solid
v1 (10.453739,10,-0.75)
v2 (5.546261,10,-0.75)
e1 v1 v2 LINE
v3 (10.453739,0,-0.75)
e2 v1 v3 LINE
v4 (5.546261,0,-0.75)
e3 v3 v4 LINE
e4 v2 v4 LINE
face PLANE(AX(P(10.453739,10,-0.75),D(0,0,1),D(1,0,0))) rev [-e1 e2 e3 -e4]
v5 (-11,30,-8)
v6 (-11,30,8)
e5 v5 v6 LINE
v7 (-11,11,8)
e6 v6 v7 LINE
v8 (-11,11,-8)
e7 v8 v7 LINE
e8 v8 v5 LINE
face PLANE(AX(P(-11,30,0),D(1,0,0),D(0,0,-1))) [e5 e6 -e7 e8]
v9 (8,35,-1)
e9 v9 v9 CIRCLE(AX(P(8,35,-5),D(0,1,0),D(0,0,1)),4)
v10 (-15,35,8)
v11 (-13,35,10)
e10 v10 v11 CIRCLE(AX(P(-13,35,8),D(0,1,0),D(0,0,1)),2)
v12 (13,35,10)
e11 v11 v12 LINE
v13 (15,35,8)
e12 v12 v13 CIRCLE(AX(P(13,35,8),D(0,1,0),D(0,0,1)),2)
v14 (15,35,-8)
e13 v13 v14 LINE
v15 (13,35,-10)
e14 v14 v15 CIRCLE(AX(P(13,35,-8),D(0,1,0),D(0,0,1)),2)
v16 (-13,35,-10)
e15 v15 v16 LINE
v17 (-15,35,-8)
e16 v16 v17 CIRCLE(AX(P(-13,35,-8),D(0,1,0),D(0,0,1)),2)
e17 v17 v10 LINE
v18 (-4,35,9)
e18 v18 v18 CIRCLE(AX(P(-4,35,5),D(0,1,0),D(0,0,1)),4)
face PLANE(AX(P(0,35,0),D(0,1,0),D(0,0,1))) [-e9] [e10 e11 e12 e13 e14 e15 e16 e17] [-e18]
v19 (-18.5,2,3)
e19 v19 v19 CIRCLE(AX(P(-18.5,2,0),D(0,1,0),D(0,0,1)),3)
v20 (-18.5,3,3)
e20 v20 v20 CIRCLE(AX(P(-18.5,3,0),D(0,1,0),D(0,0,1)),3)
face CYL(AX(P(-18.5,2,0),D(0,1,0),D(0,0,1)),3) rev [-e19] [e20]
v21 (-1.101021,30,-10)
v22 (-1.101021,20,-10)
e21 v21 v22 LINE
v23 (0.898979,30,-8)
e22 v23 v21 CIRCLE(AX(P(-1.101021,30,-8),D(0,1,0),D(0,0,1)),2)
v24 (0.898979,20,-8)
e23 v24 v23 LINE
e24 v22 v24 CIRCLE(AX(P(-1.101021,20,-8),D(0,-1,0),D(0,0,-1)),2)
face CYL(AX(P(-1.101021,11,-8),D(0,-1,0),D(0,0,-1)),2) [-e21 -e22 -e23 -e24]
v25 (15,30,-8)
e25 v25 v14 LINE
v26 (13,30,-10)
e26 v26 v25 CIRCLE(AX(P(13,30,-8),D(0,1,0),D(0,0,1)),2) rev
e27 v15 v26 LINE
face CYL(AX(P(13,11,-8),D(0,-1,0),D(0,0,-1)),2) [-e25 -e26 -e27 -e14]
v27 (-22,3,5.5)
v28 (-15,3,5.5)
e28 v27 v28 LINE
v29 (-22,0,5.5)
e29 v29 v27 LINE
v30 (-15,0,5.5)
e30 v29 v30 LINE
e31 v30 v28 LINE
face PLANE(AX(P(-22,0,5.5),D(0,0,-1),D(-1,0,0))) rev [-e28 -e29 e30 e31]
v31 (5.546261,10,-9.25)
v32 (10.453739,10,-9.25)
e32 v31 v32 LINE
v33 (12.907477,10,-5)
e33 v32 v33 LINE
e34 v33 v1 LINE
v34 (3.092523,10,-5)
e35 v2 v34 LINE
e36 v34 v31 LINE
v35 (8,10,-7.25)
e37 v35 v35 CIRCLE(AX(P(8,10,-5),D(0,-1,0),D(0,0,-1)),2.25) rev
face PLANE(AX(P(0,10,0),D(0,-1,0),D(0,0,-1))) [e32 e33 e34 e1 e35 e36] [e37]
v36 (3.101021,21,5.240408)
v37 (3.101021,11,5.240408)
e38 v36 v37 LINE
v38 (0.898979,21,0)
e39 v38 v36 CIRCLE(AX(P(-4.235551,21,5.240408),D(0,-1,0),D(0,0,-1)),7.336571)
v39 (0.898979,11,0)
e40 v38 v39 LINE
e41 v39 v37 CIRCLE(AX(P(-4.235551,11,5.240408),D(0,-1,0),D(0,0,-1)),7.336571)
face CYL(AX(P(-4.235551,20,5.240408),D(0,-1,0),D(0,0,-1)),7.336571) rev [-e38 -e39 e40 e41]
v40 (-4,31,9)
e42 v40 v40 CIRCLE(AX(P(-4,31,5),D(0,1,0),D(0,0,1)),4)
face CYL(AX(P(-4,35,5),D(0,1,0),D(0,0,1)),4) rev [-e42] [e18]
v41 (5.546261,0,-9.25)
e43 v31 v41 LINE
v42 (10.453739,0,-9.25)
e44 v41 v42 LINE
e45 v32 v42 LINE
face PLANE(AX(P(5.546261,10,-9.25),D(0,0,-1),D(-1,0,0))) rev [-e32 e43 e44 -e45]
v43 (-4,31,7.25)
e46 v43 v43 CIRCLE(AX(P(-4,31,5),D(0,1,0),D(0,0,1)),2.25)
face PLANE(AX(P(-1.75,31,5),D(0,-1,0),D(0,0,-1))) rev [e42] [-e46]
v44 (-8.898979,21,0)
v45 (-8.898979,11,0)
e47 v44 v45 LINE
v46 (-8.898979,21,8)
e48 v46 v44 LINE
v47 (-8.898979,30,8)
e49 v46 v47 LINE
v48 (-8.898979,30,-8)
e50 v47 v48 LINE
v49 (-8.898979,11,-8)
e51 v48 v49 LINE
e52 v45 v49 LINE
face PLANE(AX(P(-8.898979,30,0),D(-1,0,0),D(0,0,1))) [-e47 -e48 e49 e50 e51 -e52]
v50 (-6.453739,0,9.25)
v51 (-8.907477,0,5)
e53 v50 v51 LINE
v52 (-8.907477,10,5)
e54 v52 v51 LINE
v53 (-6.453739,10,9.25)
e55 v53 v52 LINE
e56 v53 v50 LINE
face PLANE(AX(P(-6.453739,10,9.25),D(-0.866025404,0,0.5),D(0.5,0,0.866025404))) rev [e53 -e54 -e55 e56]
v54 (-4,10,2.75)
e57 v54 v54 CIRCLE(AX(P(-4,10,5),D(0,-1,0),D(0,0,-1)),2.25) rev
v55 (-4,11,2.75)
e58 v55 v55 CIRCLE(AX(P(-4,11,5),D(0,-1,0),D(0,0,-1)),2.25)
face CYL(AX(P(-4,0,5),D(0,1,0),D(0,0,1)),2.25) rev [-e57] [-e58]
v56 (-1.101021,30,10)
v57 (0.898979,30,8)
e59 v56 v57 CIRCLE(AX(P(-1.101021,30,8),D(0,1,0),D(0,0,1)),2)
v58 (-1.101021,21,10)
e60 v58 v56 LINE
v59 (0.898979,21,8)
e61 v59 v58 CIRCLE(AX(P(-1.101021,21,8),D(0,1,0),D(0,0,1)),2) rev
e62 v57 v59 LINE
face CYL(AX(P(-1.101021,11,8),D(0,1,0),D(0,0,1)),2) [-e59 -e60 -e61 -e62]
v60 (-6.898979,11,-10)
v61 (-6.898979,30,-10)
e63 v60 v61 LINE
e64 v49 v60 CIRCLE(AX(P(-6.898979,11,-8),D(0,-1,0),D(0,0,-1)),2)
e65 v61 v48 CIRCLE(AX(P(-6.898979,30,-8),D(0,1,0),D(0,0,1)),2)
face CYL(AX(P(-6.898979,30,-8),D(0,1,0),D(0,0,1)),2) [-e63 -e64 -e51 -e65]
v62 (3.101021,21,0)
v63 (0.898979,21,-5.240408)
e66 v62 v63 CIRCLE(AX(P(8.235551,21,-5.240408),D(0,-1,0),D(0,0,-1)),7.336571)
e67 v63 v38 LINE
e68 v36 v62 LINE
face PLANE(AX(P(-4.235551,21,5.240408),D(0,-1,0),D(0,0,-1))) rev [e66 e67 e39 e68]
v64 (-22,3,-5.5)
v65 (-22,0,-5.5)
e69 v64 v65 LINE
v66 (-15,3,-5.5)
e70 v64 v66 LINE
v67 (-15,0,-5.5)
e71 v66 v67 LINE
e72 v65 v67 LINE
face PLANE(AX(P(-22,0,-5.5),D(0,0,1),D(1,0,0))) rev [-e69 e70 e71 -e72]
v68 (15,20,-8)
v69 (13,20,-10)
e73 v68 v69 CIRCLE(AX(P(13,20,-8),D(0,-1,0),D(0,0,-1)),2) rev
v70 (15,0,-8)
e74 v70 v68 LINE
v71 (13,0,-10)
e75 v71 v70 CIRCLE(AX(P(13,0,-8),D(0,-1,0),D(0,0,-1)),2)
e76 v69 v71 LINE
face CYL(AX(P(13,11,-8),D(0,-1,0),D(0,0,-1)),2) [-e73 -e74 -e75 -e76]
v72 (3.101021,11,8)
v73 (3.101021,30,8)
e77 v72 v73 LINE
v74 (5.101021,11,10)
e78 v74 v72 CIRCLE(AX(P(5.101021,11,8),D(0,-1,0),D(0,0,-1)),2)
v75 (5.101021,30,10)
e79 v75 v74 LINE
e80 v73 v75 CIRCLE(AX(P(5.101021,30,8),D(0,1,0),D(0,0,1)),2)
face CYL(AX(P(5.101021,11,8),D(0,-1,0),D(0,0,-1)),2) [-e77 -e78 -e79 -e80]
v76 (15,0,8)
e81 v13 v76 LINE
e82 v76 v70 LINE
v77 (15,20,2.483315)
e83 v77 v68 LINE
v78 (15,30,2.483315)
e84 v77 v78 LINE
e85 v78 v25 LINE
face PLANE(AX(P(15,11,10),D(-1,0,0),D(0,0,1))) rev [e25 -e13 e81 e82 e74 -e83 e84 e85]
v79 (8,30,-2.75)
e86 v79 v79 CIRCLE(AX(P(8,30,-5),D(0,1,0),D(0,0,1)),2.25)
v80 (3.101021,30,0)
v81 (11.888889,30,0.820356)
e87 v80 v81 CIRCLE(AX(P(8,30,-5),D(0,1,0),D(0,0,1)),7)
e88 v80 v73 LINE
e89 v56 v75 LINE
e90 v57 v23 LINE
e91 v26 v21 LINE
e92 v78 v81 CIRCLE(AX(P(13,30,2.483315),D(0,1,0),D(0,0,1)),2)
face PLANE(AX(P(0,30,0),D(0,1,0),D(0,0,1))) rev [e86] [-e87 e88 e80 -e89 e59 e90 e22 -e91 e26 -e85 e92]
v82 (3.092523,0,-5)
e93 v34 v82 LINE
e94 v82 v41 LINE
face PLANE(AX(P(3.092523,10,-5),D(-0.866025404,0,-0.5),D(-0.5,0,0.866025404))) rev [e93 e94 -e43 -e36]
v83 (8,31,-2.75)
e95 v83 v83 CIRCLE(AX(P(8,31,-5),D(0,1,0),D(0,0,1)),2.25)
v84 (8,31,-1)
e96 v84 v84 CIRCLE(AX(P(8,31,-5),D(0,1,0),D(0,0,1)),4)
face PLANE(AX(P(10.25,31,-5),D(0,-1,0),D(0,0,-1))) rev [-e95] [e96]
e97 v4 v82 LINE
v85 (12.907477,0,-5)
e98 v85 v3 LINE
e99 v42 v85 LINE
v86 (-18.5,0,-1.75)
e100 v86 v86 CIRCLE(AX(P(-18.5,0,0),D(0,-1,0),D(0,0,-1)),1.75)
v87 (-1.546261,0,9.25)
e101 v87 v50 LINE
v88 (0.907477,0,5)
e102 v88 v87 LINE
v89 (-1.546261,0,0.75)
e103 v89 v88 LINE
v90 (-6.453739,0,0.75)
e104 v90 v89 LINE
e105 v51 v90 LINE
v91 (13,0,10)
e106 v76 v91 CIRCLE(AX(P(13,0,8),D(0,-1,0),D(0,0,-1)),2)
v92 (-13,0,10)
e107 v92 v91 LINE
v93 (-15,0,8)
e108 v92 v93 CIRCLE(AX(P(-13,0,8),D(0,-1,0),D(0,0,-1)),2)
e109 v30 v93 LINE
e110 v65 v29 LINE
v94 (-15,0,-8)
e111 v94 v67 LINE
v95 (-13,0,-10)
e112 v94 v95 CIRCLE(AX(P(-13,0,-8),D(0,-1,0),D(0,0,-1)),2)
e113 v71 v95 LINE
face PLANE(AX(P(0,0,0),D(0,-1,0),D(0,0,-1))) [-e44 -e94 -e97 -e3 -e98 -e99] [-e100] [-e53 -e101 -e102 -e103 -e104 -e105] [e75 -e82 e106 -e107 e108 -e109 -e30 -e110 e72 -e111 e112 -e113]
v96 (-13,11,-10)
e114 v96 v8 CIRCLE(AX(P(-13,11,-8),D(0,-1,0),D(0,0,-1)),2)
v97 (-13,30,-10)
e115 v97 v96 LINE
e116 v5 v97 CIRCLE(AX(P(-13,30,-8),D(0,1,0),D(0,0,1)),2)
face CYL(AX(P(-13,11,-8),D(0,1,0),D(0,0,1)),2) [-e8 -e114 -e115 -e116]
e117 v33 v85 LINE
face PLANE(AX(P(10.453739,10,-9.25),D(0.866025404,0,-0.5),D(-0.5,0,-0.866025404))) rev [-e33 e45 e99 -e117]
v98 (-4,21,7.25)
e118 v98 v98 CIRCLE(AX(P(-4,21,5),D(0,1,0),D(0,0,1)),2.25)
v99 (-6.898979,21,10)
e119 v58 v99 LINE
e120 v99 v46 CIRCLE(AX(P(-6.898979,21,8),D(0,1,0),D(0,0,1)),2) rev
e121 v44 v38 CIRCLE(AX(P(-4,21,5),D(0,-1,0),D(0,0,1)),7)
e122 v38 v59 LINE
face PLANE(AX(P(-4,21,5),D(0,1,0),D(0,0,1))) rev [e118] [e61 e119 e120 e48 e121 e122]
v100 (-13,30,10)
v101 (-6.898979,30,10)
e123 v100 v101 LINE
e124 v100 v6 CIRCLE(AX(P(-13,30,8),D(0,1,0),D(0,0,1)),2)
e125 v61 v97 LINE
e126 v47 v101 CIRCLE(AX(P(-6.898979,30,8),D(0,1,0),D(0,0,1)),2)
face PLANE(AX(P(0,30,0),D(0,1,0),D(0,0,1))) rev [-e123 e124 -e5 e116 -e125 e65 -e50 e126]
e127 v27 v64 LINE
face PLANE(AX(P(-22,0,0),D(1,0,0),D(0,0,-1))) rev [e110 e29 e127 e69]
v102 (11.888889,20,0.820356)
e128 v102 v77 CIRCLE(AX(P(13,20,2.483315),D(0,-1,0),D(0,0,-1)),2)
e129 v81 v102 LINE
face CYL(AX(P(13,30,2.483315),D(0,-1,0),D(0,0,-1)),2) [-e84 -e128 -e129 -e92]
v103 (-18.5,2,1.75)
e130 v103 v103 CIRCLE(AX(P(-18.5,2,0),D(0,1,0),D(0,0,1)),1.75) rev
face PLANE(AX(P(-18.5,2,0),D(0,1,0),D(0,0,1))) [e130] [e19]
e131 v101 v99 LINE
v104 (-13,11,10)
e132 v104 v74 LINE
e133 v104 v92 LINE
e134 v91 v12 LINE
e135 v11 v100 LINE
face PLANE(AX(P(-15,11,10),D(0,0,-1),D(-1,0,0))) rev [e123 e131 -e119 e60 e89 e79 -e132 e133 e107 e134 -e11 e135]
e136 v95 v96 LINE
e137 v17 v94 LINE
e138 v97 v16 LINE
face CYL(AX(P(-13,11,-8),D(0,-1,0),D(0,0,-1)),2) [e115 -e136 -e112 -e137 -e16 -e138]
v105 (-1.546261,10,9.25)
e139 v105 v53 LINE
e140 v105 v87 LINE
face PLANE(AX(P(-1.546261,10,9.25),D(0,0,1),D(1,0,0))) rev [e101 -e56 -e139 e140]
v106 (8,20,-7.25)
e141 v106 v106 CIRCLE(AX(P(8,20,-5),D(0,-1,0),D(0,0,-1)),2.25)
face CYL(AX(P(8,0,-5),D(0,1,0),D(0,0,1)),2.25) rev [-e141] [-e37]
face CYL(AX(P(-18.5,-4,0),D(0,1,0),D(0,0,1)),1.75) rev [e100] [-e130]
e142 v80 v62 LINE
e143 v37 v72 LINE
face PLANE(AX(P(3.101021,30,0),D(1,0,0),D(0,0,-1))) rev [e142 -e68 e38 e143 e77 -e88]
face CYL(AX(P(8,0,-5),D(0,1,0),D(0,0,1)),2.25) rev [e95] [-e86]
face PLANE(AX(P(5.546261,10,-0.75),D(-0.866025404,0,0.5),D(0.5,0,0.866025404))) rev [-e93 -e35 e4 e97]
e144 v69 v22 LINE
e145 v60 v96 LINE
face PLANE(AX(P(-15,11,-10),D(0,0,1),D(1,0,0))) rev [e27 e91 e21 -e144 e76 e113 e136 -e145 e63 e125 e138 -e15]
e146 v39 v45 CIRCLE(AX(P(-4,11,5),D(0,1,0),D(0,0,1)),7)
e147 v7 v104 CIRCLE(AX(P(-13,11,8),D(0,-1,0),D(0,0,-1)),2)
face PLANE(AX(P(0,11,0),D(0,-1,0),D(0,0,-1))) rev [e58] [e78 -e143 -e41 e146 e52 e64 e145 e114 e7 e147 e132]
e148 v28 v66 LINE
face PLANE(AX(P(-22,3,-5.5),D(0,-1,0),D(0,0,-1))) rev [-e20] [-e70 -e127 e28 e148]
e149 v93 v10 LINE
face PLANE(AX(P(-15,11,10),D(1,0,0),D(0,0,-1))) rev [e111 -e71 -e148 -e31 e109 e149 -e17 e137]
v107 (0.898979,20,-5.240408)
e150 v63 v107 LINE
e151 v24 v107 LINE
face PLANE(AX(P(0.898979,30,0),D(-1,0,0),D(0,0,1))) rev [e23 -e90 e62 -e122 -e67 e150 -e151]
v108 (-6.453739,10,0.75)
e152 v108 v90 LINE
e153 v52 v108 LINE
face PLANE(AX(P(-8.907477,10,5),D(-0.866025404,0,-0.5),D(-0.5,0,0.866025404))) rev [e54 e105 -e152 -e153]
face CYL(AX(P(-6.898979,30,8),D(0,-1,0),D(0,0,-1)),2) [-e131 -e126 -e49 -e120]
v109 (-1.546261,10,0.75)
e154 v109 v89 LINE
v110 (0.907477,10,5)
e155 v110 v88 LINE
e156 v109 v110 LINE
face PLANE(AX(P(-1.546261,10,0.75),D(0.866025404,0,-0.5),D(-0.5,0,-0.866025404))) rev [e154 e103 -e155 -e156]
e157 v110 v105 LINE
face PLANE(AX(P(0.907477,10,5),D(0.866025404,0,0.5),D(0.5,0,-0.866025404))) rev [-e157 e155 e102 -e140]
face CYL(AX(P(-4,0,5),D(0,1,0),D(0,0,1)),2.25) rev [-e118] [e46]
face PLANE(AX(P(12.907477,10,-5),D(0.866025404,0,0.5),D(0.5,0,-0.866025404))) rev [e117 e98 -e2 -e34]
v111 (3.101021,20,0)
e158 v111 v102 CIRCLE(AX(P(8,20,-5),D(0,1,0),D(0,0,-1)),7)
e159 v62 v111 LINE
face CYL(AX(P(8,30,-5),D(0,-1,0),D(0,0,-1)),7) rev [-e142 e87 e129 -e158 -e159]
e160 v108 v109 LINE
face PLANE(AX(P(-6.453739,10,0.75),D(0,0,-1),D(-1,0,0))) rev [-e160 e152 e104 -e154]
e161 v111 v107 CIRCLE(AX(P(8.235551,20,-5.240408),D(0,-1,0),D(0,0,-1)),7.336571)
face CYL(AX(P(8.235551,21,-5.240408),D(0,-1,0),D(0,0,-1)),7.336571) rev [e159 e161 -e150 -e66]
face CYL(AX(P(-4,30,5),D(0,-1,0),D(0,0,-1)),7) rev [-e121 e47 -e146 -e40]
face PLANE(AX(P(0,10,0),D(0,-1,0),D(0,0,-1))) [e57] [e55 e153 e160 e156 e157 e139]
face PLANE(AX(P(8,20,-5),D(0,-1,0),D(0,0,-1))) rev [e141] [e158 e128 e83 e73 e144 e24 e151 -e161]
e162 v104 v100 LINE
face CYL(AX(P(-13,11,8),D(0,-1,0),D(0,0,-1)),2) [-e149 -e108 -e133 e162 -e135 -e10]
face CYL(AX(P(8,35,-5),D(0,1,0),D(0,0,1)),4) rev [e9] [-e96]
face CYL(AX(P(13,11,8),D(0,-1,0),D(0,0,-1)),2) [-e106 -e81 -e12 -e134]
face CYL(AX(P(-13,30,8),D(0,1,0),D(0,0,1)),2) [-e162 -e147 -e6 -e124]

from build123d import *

# Parameters (mm, degrees)
SKETCH1_W                                           = 30
SKETCH1_H                                           = 20
BOSS_EXTRUDE1_DEPTH                                 = 11
SKETCH2_W                                           = 4
SKETCH2_H                                           = 20
BOSS_EXTRUDE2_DEPTH                                 = 19
SKETCH3_W                                           = 30
SKETCH3_H                                           = 20
BOSS_EXTRUDE3_DEPTH                                 = 5
BOSS_EXTRUDE4_START                                 = 9
BOSS_EXTRUDE4_DEPTH                                 = 9
BOSS_EXTRUDE5_DEPTH                                 = 9
BOSS_EXTRUDE6_DEPTH                                 = 1
FILLET1_R                                           = 2
SKETCH7_R                                           = 2.25
CUT_EXTRUDE1_DEPTH                                  = 40.37003937
CBORE_FOR_M4_HEX_SOCKET_HEAD_CAP_SCREW2_D           = 4.5
CBORE_FOR_M4_HEX_SOCKET_HEAD_CAP_SCREW2_CBORE_D     = 8
CBORE_FOR_M4_HEX_SOCKET_HEAD_CAP_SCREW2_CBORE_DEPTH = 4
CUT_EXTRUDE4_DEPTH                                  = 10
SKETCH23_W                                          = 11
SKETCH23_H                                          = 3
BOSS_EXTRUDE10_DEPTH                                = 7
SKETCH24_R                                          = 1.75
CUT_EXTRUDE7_DEPTH                                  = 7
SKETCH25_R                                          = 3
CUT_EXTRUDE8_DEPTH                                  = 1
FILLET2_R                                           = 2


with BuildPart() as part:
    # Sketch1 → Boss-Extrude1 (new body)
    with BuildSketch(Plane(origin=(0, 0, 0), x_dir=(1, 0, 0), z_dir=(0, 1, 0))):
        Rectangle(SKETCH1_W, SKETCH1_H)
    extrude(amount=BOSS_EXTRUDE1_DEPTH)

    # Sketch2 → Boss-Extrude2 (add)
    with BuildSketch(Plane(origin=(0, 11, 0), x_dir=(1, 0, 0), z_dir=(0, 1, 0))):
        with Locations((-13, 0)):
            Rectangle(SKETCH2_W, SKETCH2_H)
        with BuildLine():
            Line((0.898979486, 10), (-8.898979486, 10))
            Line((-8.898979486, 10), (-8.898979486, 0))
            ThreePointArc((-8.898979486, 0), (-4, 2), (0.898979486, 0))
            Line((0.898979486, 0), (0.898979486, 10))
        make_face()
        with BuildLine():
            Line((3.101020514, 0), (3.101020514, -10))
            Line((3.101020514, -10), (15, -10))
            Line((15, -10), (15, 5))
            ThreePointArc((15, 5), (10.711747002, -1.453404388), (3.101020514, 0))
        make_face()
    extrude(amount=BOSS_EXTRUDE2_DEPTH)

    # Sketch3 → Boss-Extrude3 (add)
    with BuildSketch(Plane(origin=(0, 30, 0), x_dir=(1, 0, 0), z_dir=(0, 1, 0))):
        Rectangle(SKETCH3_W, SKETCH3_H)
    extrude(amount=BOSS_EXTRUDE3_DEPTH)

    # Sketch4 → Boss-Extrude4 (add)
    with BuildSketch(Plane.XZ.offset(-30).offset(BOSS_EXTRUDE4_START)):
        with BuildLine():
            Line((-8.898979486, 0), (-8.898979486, 10))
            Line((-8.898979486, 10), (0.898979486, 10))
            Line((0.898979486, 10), (0.898979486, 0))
            ThreePointArc((0.898979486, 0), (-4, -2), (-8.898979486, 0))
        make_face()
    extrude(amount=-BOSS_EXTRUDE4_DEPTH)

    # Sketch5 → Boss-Extrude5 (add)
    with BuildSketch(Plane(origin=(0, 11, 0), x_dir=(1, 0, 0), z_dir=(0, 1, 0))):
        with BuildLine():
            Line((15, 10), (15, 5))
            ThreePointArc((15, 5), (10.711747002, -1.453404388), (3.101020514, 0))
            Line((3.101020514, 0), (3.101020514, -5.240408206))
            ThreePointArc((3.101020514, -5.240408206), (2.528143689, -2.398275958), (0.898979486, 0))
            Line((0.898979486, 0), (0.898979486, 10))
            Line((0.898979486, 10), (15, 10))
        make_face()
    extrude(amount=BOSS_EXTRUDE5_DEPTH)

    # Sketch6 → Boss-Extrude6 (add)
    with BuildSketch(Plane(origin=(0, 20, 0), x_dir=(1, 0, 0), z_dir=(0, 1, 0))):
        with BuildLine():
            Line((3.101020514, 0), (3.101020514, -5.240408206))
            ThreePointArc((3.101020514, -5.240408206), (2.528143689, -2.398275958), (0.898979486, 0))
            Line((0.898979486, 0), (0.898979486, 5.240408206))
            ThreePointArc((0.898979486, 5.240408206), (1.471856311, 2.398275958), (3.101020514, 0))
        make_face()
    extrude(amount=BOSS_EXTRUDE6_DEPTH)

    # Fillet1
    fillet1_edges = [part.edges().sort_by_distance(p)[0] for p in [
        (-11, 20.5, 10),
        (-11, 20.5, -10),
        (0.898979486, 25, -10),
        (-8.898979486, 20.5, -10),
        (15, 25, -5),
        (3.101020514, 20.5, 10),
        (0.898979486, 25.5, 10),
        (-8.898979486, 25.5, 10),
    ]]
    fillet(fillet1_edges, radius=FILLET1_R)

    # Sketch7 → Cut-Extrude1 (cut, through all)
    with BuildSketch(Plane(origin=(0, 35, 0), x_dir=(1, 0, 0), z_dir=(0, 1, 0))):
        with Locations(Location((-4, -5, 0), (0, 0, 270))):
            Circle(SKETCH7_R)
        with Locations(Location((8, 5, 0), (0, 0, 270))):
            Circle(SKETCH7_R)
    extrude(amount=-CUT_EXTRUDE1_DEPTH, mode=Mode.SUBTRACT)

    # CBORE for M4 Hex Socket Head Cap Screw2 (through all)
    with Locations(Plane(origin=(0, 35, 0), x_dir=(1, 0, 0), z_dir=(0, 1, 0))):
        with Locations((-4, -5), (8, 5)):
            CounterBoreHole(CBORE_FOR_M4_HEX_SOCKET_HEAD_CAP_SCREW2_D / 2, CBORE_FOR_M4_HEX_SOCKET_HEAD_CAP_SCREW2_CBORE_D / 2, CBORE_FOR_M4_HEX_SOCKET_HEAD_CAP_SCREW2_CBORE_DEPTH)

    # Sketch12 → Cut-Extrude4 (cut)
    with BuildSketch(Plane.XZ):
        Polygon((0.907477288, 5), (-1.546261356, 9.25), (-6.453738644, 9.25), (-8.907477288, 5), (-6.453738644, 0.75), (-1.546261356, 0.75), align=None)
        Polygon((3.092522712, -5), (5.546261356, -9.25), (10.453738644, -9.25), (12.907477288, -5), (10.453738644, -0.75), (5.546261356, -0.75), align=None)
    extrude(amount=-CUT_EXTRUDE4_DEPTH, mode=Mode.SUBTRACT)

    # Sketch23 → Boss-Extrude10 (add)
    with BuildSketch(Plane.ZY.offset(15)):
        with Locations((0, 1.5)):
            Rectangle(SKETCH23_W, SKETCH23_H)
    extrude(amount=BOSS_EXTRUDE10_DEPTH)

    # Sketch24 → Cut-Extrude7 (cut)
    with BuildSketch(Plane(origin=(0, 3, 0), x_dir=(1, 0, 0), z_dir=(0, 1, 0))):
        with Locations(Location((-18.5, 0, 0), (0, 0, 270))):
            Circle(SKETCH24_R)
    extrude(amount=-CUT_EXTRUDE7_DEPTH, mode=Mode.SUBTRACT)

    # Sketch25 → Cut-Extrude8 (cut)
    with BuildSketch(Plane(origin=(0, 3, 0), x_dir=(1, 0, 0), z_dir=(0, 1, 0))):
        with Locations(Location((-18.5, 0, 0), (0, 0, 270))):
            Circle(SKETCH25_R)
    extrude(amount=-CUT_EXTRUDE8_DEPTH, mode=Mode.SUBTRACT)

    # Fillet2
    fillet2_edges = [part.edges().sort_by_distance(p)[0] for p in [
        (15, 32.5, -10),
        (15, 17.5, 10),
        (-15, 17.5, 10),
        (-15, 17.5, -10),
        (15, 10, -10),
    ]]
    fillet(fillet2_edges, radius=FILLET2_R - 0.0001)  # a hair under: the kernel refuses the full size


solid = part.part
